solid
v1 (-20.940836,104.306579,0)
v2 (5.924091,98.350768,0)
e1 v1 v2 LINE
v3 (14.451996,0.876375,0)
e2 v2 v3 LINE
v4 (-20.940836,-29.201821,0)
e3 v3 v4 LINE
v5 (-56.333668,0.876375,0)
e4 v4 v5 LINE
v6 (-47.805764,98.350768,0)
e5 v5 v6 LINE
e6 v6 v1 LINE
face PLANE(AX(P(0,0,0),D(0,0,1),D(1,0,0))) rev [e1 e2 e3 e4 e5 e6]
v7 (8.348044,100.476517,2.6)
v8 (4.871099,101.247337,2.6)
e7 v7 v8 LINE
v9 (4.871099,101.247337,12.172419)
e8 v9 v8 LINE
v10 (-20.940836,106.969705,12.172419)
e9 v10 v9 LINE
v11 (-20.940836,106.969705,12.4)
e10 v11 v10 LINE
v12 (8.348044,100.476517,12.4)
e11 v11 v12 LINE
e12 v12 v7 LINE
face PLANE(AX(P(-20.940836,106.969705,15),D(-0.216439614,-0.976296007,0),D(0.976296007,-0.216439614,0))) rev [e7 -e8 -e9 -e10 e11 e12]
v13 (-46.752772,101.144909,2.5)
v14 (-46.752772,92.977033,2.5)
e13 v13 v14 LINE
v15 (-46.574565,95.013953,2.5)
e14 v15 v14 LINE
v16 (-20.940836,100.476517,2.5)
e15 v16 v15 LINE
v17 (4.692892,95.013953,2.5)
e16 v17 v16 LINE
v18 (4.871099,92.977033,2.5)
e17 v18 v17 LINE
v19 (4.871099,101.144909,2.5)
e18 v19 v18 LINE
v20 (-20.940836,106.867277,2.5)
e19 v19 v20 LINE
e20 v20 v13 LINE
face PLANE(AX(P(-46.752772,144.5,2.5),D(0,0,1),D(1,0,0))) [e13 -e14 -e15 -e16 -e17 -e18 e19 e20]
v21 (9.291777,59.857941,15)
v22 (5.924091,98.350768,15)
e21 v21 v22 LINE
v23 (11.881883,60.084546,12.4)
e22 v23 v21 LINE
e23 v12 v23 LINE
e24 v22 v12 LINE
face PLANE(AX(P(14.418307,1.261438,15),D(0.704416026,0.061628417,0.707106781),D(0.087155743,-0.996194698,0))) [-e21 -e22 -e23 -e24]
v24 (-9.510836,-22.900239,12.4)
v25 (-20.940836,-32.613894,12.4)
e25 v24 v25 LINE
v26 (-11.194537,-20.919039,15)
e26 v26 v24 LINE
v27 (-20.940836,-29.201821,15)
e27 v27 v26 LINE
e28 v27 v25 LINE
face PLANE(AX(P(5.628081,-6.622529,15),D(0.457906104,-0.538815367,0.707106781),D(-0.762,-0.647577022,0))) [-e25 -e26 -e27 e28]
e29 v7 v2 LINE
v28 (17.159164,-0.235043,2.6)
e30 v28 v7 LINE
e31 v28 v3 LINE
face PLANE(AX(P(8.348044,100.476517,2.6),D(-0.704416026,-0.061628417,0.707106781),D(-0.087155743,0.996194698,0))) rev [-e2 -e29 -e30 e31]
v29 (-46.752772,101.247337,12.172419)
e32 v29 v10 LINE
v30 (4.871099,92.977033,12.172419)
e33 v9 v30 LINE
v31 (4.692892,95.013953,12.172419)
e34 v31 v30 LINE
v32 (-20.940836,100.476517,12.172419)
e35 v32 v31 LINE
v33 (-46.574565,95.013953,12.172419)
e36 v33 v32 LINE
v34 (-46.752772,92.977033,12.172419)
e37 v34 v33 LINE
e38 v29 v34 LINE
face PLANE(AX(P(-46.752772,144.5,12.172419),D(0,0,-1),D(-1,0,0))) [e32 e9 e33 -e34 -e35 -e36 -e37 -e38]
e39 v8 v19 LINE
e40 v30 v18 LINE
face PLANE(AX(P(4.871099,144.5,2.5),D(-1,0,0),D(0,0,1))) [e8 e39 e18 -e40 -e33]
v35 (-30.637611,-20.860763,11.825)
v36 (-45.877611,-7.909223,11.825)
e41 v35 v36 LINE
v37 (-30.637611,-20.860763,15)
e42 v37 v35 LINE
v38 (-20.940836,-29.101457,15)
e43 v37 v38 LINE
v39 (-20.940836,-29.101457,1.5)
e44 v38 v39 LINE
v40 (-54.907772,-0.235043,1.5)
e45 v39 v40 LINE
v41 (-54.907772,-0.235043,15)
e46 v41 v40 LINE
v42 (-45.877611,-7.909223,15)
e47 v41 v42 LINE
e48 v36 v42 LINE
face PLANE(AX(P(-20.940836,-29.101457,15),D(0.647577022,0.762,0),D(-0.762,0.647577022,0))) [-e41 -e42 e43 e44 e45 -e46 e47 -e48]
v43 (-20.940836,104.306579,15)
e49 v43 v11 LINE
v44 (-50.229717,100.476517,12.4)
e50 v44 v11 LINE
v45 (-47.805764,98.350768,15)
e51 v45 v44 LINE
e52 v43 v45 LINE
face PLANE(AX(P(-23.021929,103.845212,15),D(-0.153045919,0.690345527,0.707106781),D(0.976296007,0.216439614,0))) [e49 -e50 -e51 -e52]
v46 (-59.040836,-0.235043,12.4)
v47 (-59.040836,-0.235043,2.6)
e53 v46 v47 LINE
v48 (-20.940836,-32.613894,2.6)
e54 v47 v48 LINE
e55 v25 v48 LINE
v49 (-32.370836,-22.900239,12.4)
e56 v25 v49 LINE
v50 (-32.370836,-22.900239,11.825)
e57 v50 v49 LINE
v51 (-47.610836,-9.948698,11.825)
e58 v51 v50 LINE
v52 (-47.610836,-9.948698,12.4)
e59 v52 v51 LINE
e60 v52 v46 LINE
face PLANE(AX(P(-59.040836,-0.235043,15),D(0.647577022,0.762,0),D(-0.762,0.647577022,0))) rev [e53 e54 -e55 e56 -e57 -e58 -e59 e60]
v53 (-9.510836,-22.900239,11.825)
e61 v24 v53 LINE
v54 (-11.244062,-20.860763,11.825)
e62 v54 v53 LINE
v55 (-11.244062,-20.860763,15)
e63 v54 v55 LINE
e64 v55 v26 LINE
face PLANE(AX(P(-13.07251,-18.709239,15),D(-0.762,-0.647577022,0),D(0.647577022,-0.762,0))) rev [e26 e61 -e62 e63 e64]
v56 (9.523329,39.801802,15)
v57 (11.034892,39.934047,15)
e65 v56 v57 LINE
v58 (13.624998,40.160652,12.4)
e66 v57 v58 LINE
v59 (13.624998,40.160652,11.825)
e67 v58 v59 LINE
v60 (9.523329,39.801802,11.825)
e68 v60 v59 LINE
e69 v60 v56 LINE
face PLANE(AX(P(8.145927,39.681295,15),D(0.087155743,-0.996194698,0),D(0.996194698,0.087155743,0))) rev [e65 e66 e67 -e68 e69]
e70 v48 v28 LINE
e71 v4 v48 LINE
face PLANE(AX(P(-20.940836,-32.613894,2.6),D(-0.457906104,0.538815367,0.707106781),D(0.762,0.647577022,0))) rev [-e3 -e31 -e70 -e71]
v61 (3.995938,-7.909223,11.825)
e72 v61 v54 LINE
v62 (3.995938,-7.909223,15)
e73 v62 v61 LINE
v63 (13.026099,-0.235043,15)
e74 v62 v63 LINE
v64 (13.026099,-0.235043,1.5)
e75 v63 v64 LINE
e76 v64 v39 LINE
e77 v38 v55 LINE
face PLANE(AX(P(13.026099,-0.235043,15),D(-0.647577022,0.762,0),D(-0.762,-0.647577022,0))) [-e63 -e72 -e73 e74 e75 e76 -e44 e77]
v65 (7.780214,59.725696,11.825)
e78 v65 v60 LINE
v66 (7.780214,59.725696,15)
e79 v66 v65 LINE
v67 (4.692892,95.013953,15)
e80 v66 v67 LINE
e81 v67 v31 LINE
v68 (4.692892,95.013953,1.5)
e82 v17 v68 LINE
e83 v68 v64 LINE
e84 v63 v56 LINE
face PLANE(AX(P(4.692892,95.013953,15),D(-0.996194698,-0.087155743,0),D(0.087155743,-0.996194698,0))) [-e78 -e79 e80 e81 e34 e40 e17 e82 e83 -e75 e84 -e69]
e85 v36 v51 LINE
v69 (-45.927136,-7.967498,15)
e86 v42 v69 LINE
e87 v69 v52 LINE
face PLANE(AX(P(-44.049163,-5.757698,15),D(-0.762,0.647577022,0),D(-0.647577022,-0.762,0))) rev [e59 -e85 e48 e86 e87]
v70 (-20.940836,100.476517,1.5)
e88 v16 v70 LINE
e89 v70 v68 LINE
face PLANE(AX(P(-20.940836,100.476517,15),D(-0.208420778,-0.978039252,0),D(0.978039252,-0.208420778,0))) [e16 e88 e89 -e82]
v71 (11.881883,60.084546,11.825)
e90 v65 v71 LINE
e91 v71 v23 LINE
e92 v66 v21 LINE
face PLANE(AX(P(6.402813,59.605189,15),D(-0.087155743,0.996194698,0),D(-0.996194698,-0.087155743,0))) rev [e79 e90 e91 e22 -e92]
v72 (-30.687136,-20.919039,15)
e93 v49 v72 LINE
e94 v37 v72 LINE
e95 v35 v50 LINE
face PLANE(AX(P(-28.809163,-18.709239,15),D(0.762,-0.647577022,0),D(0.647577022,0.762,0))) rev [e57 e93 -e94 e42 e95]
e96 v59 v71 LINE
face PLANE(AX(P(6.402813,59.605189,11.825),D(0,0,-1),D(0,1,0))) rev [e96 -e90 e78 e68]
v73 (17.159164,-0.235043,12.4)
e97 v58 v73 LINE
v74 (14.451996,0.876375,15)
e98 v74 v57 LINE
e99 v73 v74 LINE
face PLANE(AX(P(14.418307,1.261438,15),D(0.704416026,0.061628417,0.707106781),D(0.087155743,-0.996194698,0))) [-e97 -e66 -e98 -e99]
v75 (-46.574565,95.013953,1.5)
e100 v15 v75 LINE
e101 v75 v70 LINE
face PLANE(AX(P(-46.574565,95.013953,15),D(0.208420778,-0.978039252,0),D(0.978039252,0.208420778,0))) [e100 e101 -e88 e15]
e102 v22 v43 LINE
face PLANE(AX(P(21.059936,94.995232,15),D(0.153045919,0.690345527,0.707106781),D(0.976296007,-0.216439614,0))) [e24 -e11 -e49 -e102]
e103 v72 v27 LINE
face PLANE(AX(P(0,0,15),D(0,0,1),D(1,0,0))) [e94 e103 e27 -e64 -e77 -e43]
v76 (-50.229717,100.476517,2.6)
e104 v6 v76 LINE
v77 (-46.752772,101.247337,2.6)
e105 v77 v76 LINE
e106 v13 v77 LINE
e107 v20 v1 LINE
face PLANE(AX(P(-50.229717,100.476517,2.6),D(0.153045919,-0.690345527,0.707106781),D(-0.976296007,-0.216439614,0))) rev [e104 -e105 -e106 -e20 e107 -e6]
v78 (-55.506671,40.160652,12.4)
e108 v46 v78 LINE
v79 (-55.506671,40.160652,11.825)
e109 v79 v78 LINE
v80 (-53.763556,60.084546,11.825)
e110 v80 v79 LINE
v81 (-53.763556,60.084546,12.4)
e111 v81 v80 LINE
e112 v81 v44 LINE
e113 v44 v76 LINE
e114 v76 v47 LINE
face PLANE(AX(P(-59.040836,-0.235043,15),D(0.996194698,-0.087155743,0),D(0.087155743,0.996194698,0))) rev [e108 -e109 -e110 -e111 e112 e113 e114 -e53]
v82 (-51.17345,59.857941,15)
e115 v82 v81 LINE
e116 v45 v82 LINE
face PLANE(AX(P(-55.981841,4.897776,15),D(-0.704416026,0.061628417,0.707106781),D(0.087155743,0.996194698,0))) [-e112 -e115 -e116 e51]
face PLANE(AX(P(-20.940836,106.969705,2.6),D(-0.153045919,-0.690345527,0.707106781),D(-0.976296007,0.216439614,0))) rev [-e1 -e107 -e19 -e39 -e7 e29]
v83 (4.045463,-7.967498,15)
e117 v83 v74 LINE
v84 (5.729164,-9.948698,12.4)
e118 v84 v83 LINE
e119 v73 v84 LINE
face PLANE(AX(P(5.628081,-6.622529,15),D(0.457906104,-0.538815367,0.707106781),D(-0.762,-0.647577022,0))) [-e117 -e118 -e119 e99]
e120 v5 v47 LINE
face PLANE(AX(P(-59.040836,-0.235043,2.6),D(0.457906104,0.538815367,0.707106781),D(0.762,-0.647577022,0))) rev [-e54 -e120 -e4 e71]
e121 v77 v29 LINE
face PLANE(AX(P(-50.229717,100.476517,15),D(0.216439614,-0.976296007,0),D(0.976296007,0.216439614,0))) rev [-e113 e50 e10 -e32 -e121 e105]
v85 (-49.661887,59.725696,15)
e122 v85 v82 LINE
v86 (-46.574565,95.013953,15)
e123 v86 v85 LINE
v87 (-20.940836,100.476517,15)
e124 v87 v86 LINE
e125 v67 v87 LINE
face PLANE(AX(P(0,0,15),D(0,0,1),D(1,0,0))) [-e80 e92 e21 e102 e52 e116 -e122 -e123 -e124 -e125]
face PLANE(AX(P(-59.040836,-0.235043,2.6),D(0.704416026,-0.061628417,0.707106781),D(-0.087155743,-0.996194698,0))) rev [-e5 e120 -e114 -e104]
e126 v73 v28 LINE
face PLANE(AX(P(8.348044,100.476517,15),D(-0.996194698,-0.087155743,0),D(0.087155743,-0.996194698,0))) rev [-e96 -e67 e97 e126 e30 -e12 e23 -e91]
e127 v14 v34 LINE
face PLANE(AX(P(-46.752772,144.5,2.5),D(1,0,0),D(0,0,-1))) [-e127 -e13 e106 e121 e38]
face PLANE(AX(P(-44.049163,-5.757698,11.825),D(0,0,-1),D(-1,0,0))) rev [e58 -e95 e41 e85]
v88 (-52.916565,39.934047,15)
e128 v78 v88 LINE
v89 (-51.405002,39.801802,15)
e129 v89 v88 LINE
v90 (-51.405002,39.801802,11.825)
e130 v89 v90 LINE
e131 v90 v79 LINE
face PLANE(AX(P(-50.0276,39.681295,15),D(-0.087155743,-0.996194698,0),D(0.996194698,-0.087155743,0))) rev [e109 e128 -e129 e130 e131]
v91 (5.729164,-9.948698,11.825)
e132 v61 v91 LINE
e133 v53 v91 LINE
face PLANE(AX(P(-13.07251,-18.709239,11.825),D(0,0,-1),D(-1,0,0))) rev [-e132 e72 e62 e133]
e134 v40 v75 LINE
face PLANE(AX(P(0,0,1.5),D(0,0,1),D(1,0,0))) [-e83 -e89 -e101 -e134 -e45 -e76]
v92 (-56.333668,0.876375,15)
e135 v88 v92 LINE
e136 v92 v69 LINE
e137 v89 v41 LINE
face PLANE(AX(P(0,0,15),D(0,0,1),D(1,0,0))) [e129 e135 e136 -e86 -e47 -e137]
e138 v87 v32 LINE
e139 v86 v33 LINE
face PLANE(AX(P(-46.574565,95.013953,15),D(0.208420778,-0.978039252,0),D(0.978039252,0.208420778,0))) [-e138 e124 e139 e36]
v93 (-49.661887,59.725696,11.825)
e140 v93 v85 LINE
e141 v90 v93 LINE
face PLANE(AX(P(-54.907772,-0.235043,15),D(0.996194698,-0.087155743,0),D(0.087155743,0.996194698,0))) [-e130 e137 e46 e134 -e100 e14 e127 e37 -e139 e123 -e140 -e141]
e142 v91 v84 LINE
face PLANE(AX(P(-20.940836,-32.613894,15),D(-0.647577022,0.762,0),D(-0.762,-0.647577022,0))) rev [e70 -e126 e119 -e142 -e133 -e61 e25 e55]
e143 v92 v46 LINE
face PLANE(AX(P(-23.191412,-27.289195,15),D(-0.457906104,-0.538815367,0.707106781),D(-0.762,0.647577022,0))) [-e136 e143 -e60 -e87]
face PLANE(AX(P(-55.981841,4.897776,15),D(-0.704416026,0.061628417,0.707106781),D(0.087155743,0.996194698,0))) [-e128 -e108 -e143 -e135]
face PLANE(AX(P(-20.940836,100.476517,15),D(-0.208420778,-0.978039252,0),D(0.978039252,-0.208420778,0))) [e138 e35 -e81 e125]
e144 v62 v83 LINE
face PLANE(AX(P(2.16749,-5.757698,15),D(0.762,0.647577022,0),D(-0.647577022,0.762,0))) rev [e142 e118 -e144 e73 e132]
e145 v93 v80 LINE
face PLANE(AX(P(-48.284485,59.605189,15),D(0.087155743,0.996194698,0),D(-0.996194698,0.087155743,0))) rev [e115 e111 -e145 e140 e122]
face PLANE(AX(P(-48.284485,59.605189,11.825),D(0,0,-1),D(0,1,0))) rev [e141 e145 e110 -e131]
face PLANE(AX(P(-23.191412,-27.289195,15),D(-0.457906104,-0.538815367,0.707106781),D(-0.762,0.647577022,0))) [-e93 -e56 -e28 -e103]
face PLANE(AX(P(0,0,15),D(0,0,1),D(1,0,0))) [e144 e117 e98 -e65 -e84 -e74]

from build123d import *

# Parameters (mm, degrees)
BOSS_EXTRUDE1_DEPTH = 15
BOSS_EXTRUDE2_DEPTH = 1.5
SKETCH4_W           = 51.62387155
SKETCH4_H           = 9.672418812
CUT_EXTRUDE2_DEPTH  = 144.5
SKETCH9_W           = 20
SKETCH9_H           = 3.175
CUT_EXTRUDE3_DEPTH  = 5.5
SKETCH6_W           = 3.175
SKETCH6_H           = 20
CUT_EXTRUDE4_DEPTH  = 5.5
SKETCH8_W           = 20
SKETCH8_H           = 3.175
CUT_EXTRUDE5_DEPTH  = 5.5
SKETCH7_W           = 3.175
SKETCH7_H           = 20
CUT_EXTRUDE6_DEPTH  = 5.5
CHAMFER1_SIZE       = 2.6


with BuildPart() as part:
    # Sketch1 → Boss-Extrude1 (new body)
    with BuildSketch(Plane.XY):
        Polygon((-59.040836406, -0.235043033), (-20.940836406, -32.613894155), (17.159163594, -0.235043033), (8.348043807, 100.476516972), (-20.940836406, 106.96970539), (-50.22971662, 100.476516972), align=None)
        Polygon((-46.574564783, 95.01395338), (-20.940836406, 100.476516972), (4.69289197, 95.01395338), (13.026099369, -0.235043033), (-20.940836406, -29.10145659), (-54.907772181, -0.235043033), align=None, mode=Mode.SUBTRACT)
    extrude(amount=BOSS_EXTRUDE1_DEPTH)

    # Sketch1<6> → Boss-Extrude2 (add)
    with BuildSketch(Plane.XY):
        Polygon((-54.907772181, -0.235043033), (-46.574564783, 95.01395338), (-20.940836406, 100.476516972), (4.69289197, 95.01395338), (13.026099369, -0.235043033), (-20.940836406, -29.10145659), align=None)
    extrude(amount=BOSS_EXTRUDE2_DEPTH)

    # Sketch4 → Cut-Extrude2 (cut)
    with BuildSketch(Plane(origin=(0, 0, 0), x_dir=(1, 0, 0), z_dir=(0, 1, 0))):
        with Locations((-20.940836406, -7.336209406)):
            Rectangle(SKETCH4_W, SKETCH4_H)
    extrude(amount=CUT_EXTRUDE2_DEPTH, mode=Mode.SUBTRACT)

    # Sketch9 → Cut-Extrude3 (cut)
    with BuildSketch(Plane(origin=(7.31178106, -8.603728938, 0), x_dir=(0.7619999999999999, 0.6475770224459791, 0), z_dir=(0.6475770224459791, -0.7619999999999999, 0))):
        with Locations((-12.076925809, 13.4125)):
            Rectangle(SKETCH9_W, SKETCH9_H)
    extrude(amount=-CUT_EXTRUDE3_DEPTH, mode=Mode.SUBTRACT)

    # Sketch6 → Cut-Extrude4 (cut)
    with BuildSketch(Plane(origin=(17.008413071, 1.488043328, 0), x_dir=(0, 0, -1), z_dir=(0.9961946980917459, 0.08715574274765506, 0))):
        with Locations((-13.4125, 48.820331729)):
            Rectangle(SKETCH6_W, SKETCH6_H)
    extrude(amount=-CUT_EXTRUDE4_DEPTH, mode=Mode.SUBTRACT)

    # Sketch8 → Cut-Extrude5 (cut)
    with BuildSketch(Plane(origin=(-24.875111844, -29.270394977, 0), x_dir=(0.7620000000000001, -0.6475770224459789, 0), z_dir=(-0.6475770224459789, -0.7620000000000001, 0))):
        with Locations((-19.836908874, 13.4125)):
            Rectangle(SKETCH8_W, SKETCH8_H)
    extrude(amount=-CUT_EXTRUDE5_DEPTH, mode=Mode.SUBTRACT)

    # Sketch7 → Cut-Extrude6 (cut)
    with BuildSketch(Plane(origin=(-58.571947524, 5.124381409, 0), x_dir=(0, 0, 1), z_dir=(-0.996194698091746, 0.0871557427476544, 0))):
        with Locations((13.4125, 45.170103428)):
            Rectangle(SKETCH7_W, SKETCH7_H)
    extrude(amount=-CUT_EXTRUDE6_DEPTH, mode=Mode.SUBTRACT)

    # Chamfer1
    # the kernel refuses this chamfer: 2.6 mm, written as the material it takes off along each edge
    with BuildSketch(Plane(origin=(-14.412954441, 108.41690198, 0), x_dir=(0.2163577817803448, -0.9759268861100734, -0.027495876610586355), z_dir=(-0.976296007119934, -0.21643961393810024, 0)), Plane(origin=(-14.412954441, 108.41690198, 15), x_dir=(-0.0059511969184851, 0.026844114547178517, -0.9996219169112966), z_dir=(-0.976296007119934, -0.21643961393810024, 0)), Plane(origin=(14.875925773, 99.029320382, 15), x_dir=(0.0059511969184853734, 0.026844114547178898, -0.9996219169112966), z_dir=(-0.9762960071199325, 0.2164396139381068, 0)), Plane(origin=(14.875925773, 99.029320382, 0), x_dir=(-0.21635778178035134, -0.9759268861100718, -0.027495876610586386), z_dir=(-0.9762960071199325, 0.2164396139381068, 0))) as chamfer1_piece_1:
        Polygon((CHAMFER1_SIZE * 0.999621916911, CHAMFER1_SIZE * 0.0274958766106), (-CHAMFER1_SIZE * 0.0274958766106, CHAMFER1_SIZE * 0.999621916911), (0, 0), align=None)
    extrude(amount=43.372751537, mode=Mode.SUBTRACT)
    with BuildSketch(Plane(origin=(-49.646960573, 107.137449062, 0), x_dir=(0.9958180537233415, -0.0871227906352381, -0.02749587661058639), z_dir=(-0.08715574274765436, -0.9961946980917459, 0)), Plane(origin=(17.74191964, -6.895975123, 0), x_dir=(-0.9958180537233413, -0.08712279063523876, -0.027495876610586372), z_dir=(-0.08715574274765503, 0.9961946980917459, 0))) as chamfer1_piece_2:
        Polygon((CHAMFER1_SIZE * 0.999621916911, CHAMFER1_SIZE * 0.0274958766106), (-CHAMFER1_SIZE * 0.0274958766106, CHAMFER1_SIZE * 0.999621916911), (0, 0), align=None)
    extrude(amount=114.46901334, mode=Mode.SUBTRACT)
    with BuildSketch(Plane(origin=(-64.135854742, 4.094900279, 0), x_dir=(-0.017805697905026136, -0.02095185797726749, 0.9996219169112966), z_dir=(0.762, -0.6475770224459791, 0))) as chamfer1_piece_3:
        Polygon((CHAMFER1_SIZE * 0.999621916911, -CHAMFER1_SIZE * 0.0274958766106), (-CHAMFER1_SIZE * 0.0274958766106, -CHAMFER1_SIZE * 0.999621916911), (0, 0), align=None)
    extrude(amount=63.372751537, mode=Mode.SUBTRACT)
    with BuildSketch(Plane(origin=(-26.035854742, -36.943837466, 0), x_dir=(-0.6473321845251594, 0.761711900686408, -0.027495876610586337), z_dir=(0.762, 0.6475770224459791, 0))) as chamfer1_piece_4:
        Polygon((CHAMFER1_SIZE * 0.999621916911, CHAMFER1_SIZE * 0.0274958766106), (-CHAMFER1_SIZE * 0.0274958766106, CHAMFER1_SIZE * 0.999621916911), (0, 0), align=None)
    extrude(amount=63.372751537, mode=Mode.SUBTRACT)
    with BuildSketch(Plane(origin=(-26.035854742, -36.943837466, 15), x_dir=(0.017805697905026178, -0.02095185797726754, -0.9996219169112966), z_dir=(0.762, 0.6475770224459791, 0)), Plane(origin=(-37.465854742, -18.570295507, 15), x_dir=(-0.017805697905026636, -0.020951857977268076, -0.9996219169112966), z_dir=(0.762, -0.6475770224459791, 0)), Plane(origin=(-64.135854742, 4.094900279, 15), x_dir=(-0.017805697905026147, -0.0209518579772675, -0.9996219169112966), z_dir=(0.762, -0.6475770224459791, 0)), Plane(origin=(0.634145258, -14.278641681, 15), x_dir=(0.017805697905025515, -0.020951857977266758, -0.9996219169112966), z_dir=(0.762, 0.6475770224459791, 0))) as chamfer1_piece_5:
        Polygon((CHAMFER1_SIZE * 0.999621916911, CHAMFER1_SIZE * 0.0274958766106), (-CHAMFER1_SIZE * 0.0274958766106, CHAMFER1_SIZE * 0.999621916911), (0, 0), align=None)
    extrude(amount=28.372751537, mode=Mode.SUBTRACT)
    with BuildSketch(Plane(origin=(-54.923914991, 46.821584065, 15), x_dir=(0.9958180537233415, -0.0871227906352381, 0.027495876610586705), z_dir=(-0.08715574274765436, -0.9961946980917459, 0))) as chamfer1_piece_6:
        Polygon((CHAMFER1_SIZE * 0.999621916911, -CHAMFER1_SIZE * 0.0274958766106), (-CHAMFER1_SIZE * 0.0274958766106, -CHAMFER1_SIZE * 0.999621916911), (0, 0), align=None)
    extrude(amount=53.922751537, mode=Mode.SUBTRACT)
    with BuildSketch(Plane(origin=(-49.646960573, 107.137449062, 15), x_dir=(-0.02739124649885124, 0.002396423548493534, -0.9996219169112966), z_dir=(-0.08715574274765436, -0.9961946980917459, 0)), Plane(origin=(12.464639417, 53.423613846, 15), x_dir=(0.027391246498851204, 0.0023964235484935496, -0.9996219169112966), z_dir=(-0.08715574274765503, 0.9961946980917459, 0))) as chamfer1_piece_7:
        Polygon((CHAMFER1_SIZE * 0.999621916911, CHAMFER1_SIZE * 0.0274958766106), (-CHAMFER1_SIZE * 0.0274958766106, CHAMFER1_SIZE * 0.999621916911), (0, 0), align=None)
    extrude(amount=53.91901334, mode=Mode.SUBTRACT)
    with BuildSketch(Plane(origin=(17.74191964, -6.895975123, 15), x_dir=(0.027391246498850576, 0.0023964235484934945, -0.9996219169112966), z_dir=(-0.08715574274765503, 0.9961946980917459, 0))) as chamfer1_piece_8:
        Polygon((CHAMFER1_SIZE * 0.999621916911, CHAMFER1_SIZE * 0.0274958766106), (-CHAMFER1_SIZE * 0.0274958766106, CHAMFER1_SIZE * 0.999621916911), (0, 0), align=None)
    extrude(amount=53.922751537, mode=Mode.SUBTRACT)


solid = part.part
